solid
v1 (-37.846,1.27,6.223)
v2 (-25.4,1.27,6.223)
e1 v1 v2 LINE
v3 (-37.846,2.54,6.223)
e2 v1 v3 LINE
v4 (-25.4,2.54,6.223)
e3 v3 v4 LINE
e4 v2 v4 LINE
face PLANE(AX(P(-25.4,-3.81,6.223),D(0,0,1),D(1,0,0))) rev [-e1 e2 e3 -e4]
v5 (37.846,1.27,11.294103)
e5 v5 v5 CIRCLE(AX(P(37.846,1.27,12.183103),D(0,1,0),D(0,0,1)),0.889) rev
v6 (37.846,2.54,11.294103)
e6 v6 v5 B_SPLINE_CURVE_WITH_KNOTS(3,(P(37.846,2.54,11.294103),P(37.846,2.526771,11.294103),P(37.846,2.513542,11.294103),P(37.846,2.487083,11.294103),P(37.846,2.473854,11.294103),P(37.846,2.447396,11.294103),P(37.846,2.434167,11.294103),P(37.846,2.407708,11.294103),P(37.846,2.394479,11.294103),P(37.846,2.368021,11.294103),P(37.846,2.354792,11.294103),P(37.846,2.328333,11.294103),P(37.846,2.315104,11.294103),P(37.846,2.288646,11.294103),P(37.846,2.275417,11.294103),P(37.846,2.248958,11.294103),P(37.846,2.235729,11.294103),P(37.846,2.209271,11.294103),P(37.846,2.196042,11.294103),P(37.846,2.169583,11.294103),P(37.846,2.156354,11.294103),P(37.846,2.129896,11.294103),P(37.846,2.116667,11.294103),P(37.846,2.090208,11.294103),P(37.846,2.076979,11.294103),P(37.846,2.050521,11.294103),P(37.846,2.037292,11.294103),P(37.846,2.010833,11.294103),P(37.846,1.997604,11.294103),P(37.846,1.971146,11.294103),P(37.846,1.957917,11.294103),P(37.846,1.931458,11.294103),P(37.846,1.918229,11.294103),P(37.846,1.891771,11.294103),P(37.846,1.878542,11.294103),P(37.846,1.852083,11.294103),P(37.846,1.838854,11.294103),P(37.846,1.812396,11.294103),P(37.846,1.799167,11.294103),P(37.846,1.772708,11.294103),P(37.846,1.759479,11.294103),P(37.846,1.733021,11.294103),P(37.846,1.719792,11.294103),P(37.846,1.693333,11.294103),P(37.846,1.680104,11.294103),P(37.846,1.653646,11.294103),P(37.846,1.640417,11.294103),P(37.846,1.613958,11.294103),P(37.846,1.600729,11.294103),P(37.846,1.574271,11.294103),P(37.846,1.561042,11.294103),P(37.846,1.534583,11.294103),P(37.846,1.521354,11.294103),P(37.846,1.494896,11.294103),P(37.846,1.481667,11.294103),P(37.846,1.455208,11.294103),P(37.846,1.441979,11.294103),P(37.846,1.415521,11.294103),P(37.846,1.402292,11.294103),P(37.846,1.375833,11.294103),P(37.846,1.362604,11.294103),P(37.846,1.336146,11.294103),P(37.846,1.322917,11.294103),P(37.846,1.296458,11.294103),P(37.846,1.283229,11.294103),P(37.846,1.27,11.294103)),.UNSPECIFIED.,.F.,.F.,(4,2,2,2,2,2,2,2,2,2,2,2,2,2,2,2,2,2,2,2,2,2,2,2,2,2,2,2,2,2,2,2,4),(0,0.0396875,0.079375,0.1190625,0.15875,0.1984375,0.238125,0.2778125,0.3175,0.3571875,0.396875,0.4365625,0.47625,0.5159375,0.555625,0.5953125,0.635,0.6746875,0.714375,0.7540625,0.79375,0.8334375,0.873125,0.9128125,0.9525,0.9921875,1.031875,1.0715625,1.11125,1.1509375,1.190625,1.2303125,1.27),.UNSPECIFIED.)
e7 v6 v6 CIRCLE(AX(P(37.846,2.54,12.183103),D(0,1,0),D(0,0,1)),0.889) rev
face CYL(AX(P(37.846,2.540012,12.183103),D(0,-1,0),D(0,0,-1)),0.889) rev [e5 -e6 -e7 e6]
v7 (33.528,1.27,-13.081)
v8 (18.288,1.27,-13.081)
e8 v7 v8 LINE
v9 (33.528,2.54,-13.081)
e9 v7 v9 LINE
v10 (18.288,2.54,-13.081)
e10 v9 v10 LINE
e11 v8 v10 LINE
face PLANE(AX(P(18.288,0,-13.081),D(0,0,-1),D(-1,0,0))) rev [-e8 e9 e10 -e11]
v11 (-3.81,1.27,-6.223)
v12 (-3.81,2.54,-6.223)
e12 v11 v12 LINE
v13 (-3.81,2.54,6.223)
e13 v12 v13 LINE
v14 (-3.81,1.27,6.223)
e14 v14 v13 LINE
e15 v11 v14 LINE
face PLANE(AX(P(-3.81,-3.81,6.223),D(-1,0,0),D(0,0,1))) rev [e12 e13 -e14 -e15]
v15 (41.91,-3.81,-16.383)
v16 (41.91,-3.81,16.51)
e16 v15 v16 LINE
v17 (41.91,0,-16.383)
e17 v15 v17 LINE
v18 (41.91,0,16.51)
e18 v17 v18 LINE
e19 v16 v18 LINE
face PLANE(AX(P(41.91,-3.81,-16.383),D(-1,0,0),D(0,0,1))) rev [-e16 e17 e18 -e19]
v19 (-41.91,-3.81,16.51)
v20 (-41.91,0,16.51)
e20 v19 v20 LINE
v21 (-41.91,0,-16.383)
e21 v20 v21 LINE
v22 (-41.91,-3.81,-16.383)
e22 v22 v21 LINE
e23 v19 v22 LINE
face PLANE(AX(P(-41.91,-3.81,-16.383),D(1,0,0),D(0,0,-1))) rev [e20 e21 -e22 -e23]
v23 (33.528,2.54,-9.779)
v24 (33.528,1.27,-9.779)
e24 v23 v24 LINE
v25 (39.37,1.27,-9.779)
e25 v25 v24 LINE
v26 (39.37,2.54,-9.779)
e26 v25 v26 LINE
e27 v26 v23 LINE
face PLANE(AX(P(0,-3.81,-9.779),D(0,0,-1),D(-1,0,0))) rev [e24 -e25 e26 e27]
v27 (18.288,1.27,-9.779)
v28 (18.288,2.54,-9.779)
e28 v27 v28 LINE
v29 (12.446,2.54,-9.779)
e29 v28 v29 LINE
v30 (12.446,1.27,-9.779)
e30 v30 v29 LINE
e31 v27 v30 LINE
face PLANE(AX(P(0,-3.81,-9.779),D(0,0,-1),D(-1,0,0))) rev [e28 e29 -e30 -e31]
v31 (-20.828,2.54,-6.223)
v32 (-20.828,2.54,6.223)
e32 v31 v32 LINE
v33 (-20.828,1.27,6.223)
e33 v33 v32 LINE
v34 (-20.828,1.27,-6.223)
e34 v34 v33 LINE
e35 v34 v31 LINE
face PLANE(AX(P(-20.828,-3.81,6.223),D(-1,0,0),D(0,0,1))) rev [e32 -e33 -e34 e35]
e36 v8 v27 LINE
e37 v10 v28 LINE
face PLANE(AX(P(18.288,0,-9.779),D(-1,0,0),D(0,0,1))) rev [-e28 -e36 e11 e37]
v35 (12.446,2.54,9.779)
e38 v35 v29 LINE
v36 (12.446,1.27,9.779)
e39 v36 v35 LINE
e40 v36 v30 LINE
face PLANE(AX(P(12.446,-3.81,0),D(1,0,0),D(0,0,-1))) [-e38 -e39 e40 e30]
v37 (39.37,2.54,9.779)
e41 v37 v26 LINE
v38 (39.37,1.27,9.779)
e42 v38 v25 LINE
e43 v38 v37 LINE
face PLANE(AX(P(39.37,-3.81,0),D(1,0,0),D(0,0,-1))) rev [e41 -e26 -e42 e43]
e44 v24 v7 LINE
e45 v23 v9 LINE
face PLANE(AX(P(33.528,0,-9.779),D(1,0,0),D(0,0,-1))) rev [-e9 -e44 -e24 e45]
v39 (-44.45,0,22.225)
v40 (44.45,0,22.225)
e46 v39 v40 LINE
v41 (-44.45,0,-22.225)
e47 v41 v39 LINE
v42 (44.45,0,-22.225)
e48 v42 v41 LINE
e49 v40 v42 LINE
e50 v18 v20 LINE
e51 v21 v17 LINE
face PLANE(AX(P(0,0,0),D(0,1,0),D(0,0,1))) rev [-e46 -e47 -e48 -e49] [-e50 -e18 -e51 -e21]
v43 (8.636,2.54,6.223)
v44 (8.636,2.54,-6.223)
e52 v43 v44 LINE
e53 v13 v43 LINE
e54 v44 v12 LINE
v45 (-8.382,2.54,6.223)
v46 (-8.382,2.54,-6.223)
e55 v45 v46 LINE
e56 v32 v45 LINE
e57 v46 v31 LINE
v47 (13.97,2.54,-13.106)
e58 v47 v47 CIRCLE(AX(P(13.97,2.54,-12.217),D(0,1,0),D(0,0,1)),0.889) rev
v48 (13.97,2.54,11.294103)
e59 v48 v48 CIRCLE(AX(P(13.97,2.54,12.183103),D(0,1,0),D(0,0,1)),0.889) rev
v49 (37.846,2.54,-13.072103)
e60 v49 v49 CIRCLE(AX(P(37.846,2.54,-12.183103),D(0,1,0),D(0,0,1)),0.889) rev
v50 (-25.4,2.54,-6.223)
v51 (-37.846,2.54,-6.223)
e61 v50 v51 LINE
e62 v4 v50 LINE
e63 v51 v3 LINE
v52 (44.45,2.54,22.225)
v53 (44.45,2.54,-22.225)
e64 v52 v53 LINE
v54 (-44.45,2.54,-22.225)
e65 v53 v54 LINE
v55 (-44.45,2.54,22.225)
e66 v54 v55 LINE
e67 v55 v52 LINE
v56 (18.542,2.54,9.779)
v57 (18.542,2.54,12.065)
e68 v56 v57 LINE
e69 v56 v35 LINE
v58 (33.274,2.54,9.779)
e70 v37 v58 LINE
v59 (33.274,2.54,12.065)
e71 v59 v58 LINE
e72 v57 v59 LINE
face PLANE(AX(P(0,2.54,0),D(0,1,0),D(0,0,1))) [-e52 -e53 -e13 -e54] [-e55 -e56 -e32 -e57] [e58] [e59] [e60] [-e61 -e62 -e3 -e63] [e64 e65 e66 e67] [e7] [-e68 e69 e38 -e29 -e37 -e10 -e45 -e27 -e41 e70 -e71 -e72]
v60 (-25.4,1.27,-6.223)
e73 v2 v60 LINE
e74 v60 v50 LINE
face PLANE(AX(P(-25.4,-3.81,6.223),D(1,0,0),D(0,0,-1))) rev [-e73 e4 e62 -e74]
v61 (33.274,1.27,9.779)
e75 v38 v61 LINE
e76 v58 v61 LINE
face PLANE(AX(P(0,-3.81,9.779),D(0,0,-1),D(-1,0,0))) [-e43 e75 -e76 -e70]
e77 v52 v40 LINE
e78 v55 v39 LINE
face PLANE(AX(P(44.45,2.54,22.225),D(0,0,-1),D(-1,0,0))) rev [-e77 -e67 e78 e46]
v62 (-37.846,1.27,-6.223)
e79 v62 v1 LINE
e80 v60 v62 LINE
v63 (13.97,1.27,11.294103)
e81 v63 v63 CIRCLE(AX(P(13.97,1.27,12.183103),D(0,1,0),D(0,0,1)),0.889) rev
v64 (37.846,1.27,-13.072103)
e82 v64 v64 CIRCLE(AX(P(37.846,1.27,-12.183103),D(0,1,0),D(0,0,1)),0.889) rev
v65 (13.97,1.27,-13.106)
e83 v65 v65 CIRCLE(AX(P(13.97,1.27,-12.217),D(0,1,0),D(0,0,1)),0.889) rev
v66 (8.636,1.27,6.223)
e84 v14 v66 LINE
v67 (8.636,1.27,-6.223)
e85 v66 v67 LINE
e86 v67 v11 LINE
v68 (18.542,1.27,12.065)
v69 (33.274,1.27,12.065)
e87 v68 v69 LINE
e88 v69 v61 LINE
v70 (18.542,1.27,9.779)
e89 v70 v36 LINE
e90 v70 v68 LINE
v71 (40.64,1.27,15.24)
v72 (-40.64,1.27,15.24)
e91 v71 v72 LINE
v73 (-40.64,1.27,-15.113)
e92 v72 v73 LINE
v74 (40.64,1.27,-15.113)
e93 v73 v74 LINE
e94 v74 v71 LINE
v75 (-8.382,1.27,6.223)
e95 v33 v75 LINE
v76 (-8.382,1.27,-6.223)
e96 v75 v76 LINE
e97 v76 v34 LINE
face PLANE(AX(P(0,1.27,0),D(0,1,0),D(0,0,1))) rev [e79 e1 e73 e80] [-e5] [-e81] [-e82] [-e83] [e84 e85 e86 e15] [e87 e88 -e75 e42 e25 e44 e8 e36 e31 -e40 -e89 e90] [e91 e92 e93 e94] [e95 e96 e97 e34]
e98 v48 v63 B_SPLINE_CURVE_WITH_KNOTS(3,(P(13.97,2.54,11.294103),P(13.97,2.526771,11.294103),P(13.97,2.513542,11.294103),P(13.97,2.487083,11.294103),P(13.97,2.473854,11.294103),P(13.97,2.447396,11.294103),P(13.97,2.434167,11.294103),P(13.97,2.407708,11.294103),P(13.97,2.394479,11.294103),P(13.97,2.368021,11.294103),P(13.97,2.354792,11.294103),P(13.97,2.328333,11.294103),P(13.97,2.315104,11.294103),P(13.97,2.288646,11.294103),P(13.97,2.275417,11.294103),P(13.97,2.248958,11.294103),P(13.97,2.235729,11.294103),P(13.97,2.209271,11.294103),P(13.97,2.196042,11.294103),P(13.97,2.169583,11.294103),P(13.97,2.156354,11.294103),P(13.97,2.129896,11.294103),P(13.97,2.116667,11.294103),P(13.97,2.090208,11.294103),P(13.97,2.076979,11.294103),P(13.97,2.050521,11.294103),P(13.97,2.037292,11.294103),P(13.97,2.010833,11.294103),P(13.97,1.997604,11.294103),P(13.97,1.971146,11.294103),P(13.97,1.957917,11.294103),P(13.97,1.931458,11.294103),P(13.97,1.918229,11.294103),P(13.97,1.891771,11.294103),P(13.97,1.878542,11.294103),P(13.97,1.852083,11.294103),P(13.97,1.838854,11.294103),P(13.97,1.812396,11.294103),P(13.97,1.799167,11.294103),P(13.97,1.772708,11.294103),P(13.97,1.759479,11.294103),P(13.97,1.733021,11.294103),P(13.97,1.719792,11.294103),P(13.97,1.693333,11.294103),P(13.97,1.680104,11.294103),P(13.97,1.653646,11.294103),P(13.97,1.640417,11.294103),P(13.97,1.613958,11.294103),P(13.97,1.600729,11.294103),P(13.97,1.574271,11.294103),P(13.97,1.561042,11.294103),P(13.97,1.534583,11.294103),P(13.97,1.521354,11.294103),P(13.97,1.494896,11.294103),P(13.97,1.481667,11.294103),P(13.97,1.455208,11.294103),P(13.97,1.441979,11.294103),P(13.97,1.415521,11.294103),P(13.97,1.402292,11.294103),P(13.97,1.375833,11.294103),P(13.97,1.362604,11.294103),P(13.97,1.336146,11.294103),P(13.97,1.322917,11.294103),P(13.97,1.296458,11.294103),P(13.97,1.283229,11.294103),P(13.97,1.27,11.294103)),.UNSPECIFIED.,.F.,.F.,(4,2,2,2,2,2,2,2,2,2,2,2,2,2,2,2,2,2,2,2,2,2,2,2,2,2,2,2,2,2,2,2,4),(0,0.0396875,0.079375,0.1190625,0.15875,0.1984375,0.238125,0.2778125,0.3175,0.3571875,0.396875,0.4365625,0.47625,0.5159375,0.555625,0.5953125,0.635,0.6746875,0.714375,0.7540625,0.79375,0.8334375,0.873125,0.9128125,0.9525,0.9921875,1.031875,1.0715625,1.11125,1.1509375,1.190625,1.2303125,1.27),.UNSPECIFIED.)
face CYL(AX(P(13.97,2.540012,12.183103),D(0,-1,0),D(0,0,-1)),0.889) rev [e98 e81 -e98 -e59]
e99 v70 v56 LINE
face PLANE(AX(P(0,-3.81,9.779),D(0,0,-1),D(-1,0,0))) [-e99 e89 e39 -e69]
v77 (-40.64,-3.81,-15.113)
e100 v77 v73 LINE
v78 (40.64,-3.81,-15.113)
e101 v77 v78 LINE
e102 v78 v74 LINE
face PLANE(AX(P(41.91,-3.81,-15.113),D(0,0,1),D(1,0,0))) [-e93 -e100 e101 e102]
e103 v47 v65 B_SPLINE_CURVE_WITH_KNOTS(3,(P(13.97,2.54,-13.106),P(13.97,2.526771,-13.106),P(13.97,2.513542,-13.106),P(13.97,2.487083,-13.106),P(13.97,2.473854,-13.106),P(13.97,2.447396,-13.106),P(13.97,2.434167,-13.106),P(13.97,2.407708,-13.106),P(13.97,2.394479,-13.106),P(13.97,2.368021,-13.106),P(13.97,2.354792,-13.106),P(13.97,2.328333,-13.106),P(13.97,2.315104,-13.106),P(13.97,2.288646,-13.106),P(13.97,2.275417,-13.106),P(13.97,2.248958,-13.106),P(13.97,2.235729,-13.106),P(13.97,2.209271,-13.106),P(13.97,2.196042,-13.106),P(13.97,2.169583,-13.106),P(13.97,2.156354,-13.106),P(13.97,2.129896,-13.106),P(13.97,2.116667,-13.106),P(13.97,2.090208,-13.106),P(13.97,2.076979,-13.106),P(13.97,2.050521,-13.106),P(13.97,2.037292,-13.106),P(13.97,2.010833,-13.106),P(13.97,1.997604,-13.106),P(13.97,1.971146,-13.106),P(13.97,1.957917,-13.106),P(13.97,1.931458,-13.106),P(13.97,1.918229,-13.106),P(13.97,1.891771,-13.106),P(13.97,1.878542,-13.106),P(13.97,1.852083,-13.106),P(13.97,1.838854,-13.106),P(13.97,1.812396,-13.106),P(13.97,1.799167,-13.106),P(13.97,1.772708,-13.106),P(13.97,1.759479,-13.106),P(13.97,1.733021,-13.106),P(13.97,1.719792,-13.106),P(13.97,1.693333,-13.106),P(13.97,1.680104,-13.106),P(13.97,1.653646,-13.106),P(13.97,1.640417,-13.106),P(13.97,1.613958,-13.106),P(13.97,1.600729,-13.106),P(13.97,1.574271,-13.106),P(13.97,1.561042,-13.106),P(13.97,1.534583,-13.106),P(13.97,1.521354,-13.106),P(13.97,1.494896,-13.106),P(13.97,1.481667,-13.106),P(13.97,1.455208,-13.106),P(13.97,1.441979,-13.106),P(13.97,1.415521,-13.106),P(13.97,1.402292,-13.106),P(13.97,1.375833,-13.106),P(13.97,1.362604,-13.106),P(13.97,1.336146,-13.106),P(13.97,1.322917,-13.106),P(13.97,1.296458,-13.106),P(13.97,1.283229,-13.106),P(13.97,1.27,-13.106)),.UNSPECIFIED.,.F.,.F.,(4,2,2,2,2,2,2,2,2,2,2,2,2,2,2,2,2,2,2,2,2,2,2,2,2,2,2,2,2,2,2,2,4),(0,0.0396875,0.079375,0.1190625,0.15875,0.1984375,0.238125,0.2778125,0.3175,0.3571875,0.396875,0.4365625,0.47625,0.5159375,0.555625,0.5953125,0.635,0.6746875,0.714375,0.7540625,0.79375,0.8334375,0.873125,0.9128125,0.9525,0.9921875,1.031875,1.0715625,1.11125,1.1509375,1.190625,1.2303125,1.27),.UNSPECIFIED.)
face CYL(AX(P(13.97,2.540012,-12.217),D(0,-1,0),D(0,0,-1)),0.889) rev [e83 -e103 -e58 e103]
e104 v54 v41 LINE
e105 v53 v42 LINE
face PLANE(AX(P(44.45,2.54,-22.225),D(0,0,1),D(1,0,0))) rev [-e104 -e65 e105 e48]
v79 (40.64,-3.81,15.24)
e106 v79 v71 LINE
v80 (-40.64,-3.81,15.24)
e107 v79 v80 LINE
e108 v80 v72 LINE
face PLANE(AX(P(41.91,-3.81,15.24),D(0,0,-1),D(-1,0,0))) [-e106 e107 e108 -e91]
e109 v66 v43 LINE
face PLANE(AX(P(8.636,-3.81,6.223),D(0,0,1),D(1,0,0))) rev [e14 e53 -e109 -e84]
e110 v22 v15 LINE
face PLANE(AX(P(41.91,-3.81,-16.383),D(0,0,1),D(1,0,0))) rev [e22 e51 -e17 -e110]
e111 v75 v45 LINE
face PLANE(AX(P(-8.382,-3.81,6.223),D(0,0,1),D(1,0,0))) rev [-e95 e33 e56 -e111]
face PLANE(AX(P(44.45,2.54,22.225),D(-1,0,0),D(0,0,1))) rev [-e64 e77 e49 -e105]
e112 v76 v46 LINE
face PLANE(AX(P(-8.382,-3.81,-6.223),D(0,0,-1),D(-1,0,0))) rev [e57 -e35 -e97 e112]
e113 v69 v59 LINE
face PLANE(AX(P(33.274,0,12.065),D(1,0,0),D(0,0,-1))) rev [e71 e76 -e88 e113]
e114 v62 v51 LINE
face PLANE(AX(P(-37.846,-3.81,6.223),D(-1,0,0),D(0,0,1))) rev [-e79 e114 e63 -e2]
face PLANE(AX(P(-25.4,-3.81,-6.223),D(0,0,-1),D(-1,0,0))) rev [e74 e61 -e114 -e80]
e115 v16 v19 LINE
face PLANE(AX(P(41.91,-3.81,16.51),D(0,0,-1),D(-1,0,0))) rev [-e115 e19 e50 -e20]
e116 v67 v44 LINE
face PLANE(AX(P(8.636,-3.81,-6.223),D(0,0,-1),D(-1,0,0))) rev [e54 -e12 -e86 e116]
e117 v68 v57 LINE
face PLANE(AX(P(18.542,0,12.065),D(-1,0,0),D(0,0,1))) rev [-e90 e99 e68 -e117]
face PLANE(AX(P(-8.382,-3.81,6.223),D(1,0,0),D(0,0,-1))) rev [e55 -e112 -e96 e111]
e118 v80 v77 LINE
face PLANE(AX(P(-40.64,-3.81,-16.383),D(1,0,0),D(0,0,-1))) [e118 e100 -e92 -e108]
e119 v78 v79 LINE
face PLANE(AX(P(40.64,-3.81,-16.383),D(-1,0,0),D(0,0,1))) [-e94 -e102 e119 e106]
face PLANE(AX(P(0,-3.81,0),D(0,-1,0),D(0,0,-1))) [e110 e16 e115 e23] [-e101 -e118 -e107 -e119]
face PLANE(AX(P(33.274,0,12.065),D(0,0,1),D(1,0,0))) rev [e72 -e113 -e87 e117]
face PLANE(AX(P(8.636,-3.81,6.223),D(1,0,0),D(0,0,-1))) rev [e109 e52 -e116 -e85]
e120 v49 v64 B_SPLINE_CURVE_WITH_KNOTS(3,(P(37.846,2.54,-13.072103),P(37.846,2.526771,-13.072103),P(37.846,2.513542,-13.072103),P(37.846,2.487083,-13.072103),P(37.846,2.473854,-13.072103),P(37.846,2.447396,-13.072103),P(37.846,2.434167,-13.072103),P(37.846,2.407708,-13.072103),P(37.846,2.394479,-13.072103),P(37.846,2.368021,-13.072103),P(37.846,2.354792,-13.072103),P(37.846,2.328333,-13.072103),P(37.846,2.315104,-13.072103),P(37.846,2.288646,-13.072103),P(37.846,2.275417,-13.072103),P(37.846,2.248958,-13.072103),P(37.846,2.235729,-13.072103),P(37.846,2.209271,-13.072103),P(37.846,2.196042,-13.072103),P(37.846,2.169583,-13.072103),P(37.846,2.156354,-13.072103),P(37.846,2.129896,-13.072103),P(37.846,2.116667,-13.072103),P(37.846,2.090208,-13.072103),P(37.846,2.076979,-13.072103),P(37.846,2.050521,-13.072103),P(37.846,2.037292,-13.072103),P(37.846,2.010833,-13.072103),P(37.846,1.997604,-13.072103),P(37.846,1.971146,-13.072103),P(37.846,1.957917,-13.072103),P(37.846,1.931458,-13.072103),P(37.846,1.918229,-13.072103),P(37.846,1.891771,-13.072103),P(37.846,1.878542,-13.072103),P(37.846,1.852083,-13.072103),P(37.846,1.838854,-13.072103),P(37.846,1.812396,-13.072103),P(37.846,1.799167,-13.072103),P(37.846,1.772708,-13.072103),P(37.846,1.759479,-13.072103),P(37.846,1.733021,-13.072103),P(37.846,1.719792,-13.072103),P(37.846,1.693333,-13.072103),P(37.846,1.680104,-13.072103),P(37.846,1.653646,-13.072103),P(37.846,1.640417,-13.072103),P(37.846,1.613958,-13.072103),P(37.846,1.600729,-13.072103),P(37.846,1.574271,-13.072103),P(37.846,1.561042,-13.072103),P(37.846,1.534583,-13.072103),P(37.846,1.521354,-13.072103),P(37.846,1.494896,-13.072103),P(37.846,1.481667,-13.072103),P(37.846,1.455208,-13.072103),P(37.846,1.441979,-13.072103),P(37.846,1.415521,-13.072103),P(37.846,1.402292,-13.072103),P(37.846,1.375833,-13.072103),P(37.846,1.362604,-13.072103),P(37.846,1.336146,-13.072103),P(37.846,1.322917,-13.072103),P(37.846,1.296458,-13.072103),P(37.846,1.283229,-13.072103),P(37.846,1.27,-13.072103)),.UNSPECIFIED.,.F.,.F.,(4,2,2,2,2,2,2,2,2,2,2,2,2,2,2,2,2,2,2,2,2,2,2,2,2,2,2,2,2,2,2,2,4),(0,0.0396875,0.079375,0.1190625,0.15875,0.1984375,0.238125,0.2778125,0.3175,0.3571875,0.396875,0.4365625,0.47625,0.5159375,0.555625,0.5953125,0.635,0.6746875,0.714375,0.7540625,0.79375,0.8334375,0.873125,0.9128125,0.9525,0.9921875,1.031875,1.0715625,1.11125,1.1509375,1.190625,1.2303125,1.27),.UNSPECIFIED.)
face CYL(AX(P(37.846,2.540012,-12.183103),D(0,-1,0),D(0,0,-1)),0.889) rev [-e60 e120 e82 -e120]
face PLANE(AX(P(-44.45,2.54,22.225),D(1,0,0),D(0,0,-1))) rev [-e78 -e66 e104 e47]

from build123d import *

# Parameters (mm, degrees)
SKETCH2_W               = 88.9
SKETCH2_H               = 44.45
BOSS_EXTRUDE1_DEPTH     = 2.54
SKETCH5_W               = 83.82
SKETCH5_H               = 32.893
BOSS_EXTRUDE2_DEPTH     = 3.81
SHELL1_START            = -3.81
SHELL1_OUTLINE_W        = 81.28
SHELL1_OUTLINE_H        = 30.353
SHELL1_DEPTH            = 5.08
CUT_EXTRUDE1_DEPTH      = 51.100654936
CUT_EXTRUDE1_DEPTH_BACK = 51.100654936
SKETCH3_W               = 26.924
SKETCH3_H               = 19.558
CUT_EXTRUDE2_DEPTH      = 51.100654936
CUT_EXTRUDE2_DEPTH_BACK = 51.100654936
SKETCH4_W               = 12.446
SKETCH4_H               = 12.446
CUT_EXTRUDE3_DEPTH      = 51.100654936
CUT_EXTRUDE3_DEPTH_BACK = 2.54
SKETCH3_3_R             = 0.889
SKETCH6_W               = 14.732
SKETCH6_H               = 2.286
SKETCH6_W_2             = 15.24
SKETCH6_H_2             = 3.302
CUT_EXTRUDE4_DEPTH      = 2.54


# Read off the part's stored shape, not the designer's step: Shell1
with BuildPart() as part:
    # Sketch2 → Boss-Extrude1 (new body)
    with BuildSketch(Plane(origin=(0, 0, 0), x_dir=(1, 0, 0), z_dir=(0, 1, 0))):
        Rectangle(SKETCH2_W, SKETCH2_H)
    extrude(amount=BOSS_EXTRUDE1_DEPTH)

    # Sketch5 → Boss-Extrude2 (add)
    with BuildSketch(Plane.XZ):
        with Locations((0, 0.0635)):
            Rectangle(SKETCH5_W, SKETCH5_H)
    extrude(amount=BOSS_EXTRUDE2_DEPTH)

    # Shell1 outline → Shell1 (cut)
    with BuildSketch(Plane(origin=(0, 0, 0), x_dir=(1, 0, 0), z_dir=(0, 1, 0)).offset(SHELL1_START)):
        with Locations((0, -0.0635)):
            Rectangle(SHELL1_OUTLINE_W, SHELL1_OUTLINE_H)
    extrude(amount=SHELL1_DEPTH, mode=Mode.SUBTRACT)

    # Sketch3 → Cut-Extrude1 (cut, two sides: drawn at the far end of the back side and taken through both)
    with BuildSketch(Plane(origin=(0, 2.54, 0), x_dir=(1, 0, 0), z_dir=(0, 1, 0)).offset(-CUT_EXTRUDE1_DEPTH_BACK)):
        with Locations((25.908, 0)):
            Rectangle(SKETCH3_W, SKETCH3_H)
    extrude(amount=CUT_EXTRUDE1_DEPTH + CUT_EXTRUDE1_DEPTH_BACK, mode=Mode.SUBTRACT)

    # Sketch4 → Cut-Extrude2 (cut, two sides: drawn at the far end of the back side and taken through both)
    with BuildSketch(Plane(origin=(0, 2.54, 0), x_dir=(1, 0, 0), z_dir=(0, 1, 0)).offset(-CUT_EXTRUDE2_DEPTH_BACK)):
        with Locations((2.413, 0)):
            Rectangle(SKETCH4_W, SKETCH4_H)
        with Locations((-14.605, 0)):
            Rectangle(SKETCH4_W, SKETCH4_H)
        with Locations((-31.623, 0)):
            Rectangle(SKETCH4_W, SKETCH4_H)
    extrude(amount=CUT_EXTRUDE2_DEPTH + CUT_EXTRUDE2_DEPTH_BACK, mode=Mode.SUBTRACT)

    # Sketch3<3> → Cut-Extrude3 (cut, two sides: drawn at the far end of the back side and taken through both)
    with BuildSketch(Plane(origin=(0, 2.54, 0), x_dir=(1, 0, 0), z_dir=(0, 1, 0)).offset(-CUT_EXTRUDE3_DEPTH_BACK)):
        with Locations(Location((37.846, -12.183102804, 0), (0, 0, 90))):
            Circle(SKETCH3_3_R)
        with Locations(Location((13.97, -12.183102804, 0), (0, 0, 90))):
            Circle(SKETCH3_3_R)
        with Locations(Location((13.97, 12.217, 0), (0, 0, 90))):
            Circle(SKETCH3_3_R)
        with Locations(Location((37.846, 12.183102804, 0), (0, 0, 90))):
            Circle(SKETCH3_3_R)
    extrude(amount=CUT_EXTRUDE3_DEPTH + CUT_EXTRUDE3_DEPTH_BACK, mode=Mode.SUBTRACT)

    # Sketch6 → Cut-Extrude4 (cut)
    with BuildSketch(Plane(origin=(0, 2.54, 0), x_dir=(1, 0, 0), z_dir=(0, 1, 0))):
        with Locations((25.908, -10.922)):
            Rectangle(SKETCH6_W, SKETCH6_H)
        with Locations((25.908, 11.43)):
            Rectangle(SKETCH6_W_2, SKETCH6_H_2)
    extrude(amount=-CUT_EXTRUDE4_DEPTH, mode=Mode.SUBTRACT)


solid = part.part
